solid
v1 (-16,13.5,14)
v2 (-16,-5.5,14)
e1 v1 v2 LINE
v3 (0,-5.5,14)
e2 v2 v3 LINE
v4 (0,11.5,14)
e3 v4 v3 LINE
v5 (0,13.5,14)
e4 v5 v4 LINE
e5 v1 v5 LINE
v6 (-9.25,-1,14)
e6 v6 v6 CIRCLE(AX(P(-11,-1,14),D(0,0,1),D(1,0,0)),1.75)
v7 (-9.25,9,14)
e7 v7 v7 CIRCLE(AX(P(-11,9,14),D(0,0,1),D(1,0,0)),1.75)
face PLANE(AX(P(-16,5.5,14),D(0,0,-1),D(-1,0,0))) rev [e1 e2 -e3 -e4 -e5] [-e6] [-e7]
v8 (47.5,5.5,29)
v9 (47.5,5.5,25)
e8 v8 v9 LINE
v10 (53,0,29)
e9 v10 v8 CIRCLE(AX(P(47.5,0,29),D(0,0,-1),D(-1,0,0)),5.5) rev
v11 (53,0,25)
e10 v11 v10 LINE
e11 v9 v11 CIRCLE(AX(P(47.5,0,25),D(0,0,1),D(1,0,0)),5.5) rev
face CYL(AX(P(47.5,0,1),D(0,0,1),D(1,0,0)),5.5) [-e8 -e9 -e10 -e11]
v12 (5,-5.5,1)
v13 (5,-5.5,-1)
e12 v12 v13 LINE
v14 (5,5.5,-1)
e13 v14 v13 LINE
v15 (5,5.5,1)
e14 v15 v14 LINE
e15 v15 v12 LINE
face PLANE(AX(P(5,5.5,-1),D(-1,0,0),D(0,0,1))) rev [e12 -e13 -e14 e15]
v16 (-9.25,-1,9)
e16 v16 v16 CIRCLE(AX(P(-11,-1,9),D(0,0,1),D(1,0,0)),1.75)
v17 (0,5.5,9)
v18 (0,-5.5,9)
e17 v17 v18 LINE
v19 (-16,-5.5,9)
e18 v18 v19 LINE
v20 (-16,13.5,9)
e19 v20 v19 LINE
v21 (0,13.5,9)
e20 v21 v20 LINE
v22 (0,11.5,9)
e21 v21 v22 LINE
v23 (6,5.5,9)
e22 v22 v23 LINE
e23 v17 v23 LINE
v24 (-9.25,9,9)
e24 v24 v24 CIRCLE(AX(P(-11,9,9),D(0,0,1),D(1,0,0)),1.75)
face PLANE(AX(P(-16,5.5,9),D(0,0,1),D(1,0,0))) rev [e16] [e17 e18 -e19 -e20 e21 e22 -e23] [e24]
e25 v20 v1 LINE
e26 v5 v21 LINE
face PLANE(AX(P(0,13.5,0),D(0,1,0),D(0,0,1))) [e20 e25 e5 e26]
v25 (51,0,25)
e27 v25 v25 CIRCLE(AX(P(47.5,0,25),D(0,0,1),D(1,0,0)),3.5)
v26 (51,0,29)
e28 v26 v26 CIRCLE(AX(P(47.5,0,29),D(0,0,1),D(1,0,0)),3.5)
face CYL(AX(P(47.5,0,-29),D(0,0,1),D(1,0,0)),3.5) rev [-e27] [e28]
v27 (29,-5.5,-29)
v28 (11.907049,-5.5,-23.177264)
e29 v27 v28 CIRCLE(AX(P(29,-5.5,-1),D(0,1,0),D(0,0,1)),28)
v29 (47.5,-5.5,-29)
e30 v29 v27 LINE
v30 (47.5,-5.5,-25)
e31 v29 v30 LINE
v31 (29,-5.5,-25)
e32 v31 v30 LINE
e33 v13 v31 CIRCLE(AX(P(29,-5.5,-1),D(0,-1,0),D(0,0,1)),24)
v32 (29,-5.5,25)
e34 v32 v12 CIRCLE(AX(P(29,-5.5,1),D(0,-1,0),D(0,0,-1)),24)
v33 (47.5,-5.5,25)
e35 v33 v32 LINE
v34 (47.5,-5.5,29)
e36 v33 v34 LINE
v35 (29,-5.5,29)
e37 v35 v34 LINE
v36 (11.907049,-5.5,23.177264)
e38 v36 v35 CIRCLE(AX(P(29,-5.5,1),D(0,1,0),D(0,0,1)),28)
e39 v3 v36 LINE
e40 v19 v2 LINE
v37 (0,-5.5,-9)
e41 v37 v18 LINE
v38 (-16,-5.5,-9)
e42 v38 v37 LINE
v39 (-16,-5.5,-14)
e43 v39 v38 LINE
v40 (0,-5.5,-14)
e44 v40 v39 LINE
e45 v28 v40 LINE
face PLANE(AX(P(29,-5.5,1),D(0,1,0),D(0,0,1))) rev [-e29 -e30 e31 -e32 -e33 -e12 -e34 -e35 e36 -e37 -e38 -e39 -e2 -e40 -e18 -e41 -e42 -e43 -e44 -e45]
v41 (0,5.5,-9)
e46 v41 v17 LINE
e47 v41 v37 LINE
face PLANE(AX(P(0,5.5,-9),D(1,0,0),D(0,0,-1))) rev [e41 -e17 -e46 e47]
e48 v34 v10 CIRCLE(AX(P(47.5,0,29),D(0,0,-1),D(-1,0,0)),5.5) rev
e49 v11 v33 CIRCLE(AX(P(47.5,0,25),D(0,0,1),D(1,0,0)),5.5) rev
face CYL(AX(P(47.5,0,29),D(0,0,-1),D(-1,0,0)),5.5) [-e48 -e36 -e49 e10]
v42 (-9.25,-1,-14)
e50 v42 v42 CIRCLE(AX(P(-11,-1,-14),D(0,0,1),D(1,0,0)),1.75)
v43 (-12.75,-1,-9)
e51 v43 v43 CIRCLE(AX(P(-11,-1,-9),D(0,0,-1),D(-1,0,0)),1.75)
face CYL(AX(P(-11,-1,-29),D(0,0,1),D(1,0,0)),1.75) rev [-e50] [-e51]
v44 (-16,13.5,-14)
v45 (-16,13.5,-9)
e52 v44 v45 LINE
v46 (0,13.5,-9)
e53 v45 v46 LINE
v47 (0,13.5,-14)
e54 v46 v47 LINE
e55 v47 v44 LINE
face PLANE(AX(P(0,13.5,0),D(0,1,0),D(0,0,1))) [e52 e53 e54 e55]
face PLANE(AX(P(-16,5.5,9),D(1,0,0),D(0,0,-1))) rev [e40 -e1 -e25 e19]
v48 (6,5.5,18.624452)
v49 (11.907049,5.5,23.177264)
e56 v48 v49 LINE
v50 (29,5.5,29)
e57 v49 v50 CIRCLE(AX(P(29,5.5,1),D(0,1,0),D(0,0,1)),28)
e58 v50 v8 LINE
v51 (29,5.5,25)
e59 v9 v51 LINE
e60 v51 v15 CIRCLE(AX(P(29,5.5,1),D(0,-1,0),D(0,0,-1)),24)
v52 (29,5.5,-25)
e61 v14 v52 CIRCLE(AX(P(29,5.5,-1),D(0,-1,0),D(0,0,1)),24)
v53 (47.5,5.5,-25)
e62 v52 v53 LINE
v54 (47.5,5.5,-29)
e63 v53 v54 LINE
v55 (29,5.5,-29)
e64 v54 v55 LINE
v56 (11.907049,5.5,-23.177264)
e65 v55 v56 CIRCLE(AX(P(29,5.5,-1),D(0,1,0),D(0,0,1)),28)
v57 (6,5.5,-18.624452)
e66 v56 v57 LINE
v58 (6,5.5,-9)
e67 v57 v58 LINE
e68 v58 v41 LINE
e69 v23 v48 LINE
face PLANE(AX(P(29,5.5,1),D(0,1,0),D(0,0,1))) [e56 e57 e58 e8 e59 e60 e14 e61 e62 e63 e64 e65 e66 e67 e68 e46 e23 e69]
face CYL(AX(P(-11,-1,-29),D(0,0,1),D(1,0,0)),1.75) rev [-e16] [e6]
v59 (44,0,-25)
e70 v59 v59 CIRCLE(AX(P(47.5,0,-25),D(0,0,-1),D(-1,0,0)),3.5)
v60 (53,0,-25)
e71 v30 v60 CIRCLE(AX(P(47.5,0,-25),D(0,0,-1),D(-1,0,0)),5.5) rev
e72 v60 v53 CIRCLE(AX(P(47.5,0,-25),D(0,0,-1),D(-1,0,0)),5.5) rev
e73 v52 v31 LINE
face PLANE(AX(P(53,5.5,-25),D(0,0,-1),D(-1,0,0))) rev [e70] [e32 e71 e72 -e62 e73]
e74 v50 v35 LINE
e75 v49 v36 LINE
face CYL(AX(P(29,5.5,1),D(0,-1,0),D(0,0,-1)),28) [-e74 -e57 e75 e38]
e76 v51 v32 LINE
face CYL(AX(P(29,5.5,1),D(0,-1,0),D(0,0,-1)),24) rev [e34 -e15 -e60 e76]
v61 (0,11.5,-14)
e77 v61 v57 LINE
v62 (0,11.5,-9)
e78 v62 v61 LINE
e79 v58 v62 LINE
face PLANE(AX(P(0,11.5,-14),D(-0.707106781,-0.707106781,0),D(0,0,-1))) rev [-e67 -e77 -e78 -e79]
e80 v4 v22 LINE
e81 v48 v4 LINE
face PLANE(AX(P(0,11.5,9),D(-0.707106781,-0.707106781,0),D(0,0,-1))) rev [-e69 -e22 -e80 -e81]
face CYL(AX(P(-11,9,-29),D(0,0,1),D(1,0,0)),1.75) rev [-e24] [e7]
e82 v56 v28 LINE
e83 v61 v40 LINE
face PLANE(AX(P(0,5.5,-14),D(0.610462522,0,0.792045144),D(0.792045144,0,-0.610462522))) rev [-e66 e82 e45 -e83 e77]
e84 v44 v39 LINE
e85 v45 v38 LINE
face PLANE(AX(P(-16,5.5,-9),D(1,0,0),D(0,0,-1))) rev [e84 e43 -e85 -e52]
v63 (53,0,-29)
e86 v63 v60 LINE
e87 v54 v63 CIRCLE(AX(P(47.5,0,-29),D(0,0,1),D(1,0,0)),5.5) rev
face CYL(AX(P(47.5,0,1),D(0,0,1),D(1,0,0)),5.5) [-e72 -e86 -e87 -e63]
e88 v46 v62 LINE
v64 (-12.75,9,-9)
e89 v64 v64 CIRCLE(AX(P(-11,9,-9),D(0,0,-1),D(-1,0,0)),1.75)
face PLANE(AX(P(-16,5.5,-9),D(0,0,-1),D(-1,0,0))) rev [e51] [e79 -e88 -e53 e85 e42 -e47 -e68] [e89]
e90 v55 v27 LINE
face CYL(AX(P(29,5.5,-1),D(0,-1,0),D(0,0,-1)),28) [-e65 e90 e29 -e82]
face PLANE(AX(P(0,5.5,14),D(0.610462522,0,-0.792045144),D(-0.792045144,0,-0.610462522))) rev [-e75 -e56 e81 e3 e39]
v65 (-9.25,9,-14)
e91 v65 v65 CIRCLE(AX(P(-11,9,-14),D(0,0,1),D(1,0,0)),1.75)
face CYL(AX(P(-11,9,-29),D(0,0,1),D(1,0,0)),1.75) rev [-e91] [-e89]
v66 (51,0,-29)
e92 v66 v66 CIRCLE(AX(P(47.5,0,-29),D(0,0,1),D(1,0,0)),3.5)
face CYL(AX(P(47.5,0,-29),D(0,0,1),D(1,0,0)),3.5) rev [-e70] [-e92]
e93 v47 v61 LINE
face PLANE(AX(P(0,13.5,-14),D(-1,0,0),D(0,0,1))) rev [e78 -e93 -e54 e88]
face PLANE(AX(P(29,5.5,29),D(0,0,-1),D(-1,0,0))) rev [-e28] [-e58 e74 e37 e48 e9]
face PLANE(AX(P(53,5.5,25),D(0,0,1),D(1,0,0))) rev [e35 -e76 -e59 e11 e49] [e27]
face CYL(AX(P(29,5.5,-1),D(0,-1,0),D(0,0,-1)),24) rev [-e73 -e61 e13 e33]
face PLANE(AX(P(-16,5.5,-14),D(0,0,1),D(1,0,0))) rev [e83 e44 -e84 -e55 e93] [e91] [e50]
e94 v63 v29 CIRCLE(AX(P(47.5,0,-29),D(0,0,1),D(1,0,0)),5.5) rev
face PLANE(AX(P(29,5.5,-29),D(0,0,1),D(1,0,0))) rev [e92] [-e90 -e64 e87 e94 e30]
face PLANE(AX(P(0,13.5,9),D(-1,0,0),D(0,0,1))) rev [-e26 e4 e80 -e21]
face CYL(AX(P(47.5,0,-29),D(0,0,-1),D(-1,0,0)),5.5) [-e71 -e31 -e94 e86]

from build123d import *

# Parameters (mm, degrees)
BOSS_EXTRUDE1_DEPTH = 5.5
FILLET1_R           = 5.5
SKETCH2_R           = 3.5
CUT_EXTRUDE1_DEPTH  = 79.760713557
SKETCH3_W           = 16
SKETCH3_H           = 5
BOSS_EXTRUDE2_DEPTH = 8
SKETCH4_R           = 1.75
CUT_EXTRUDE2_DEPTH  = 70.571905249
CHAMFER1_SIZE       = 6


# Some blends are built 0.0001 mm under size
with BuildPart() as part:
    # Sketch1 → Boss-Extrude1 (new, symmetric)
    with BuildSketch(Plane(origin=(0, 0, 0), x_dir=(1, 0, 0), z_dir=(0, 1, 0))):
        with BuildLine():
            Line((-16, 9), (-16, 14))
            Line((-16, 14), (0, 14))
            Line((0, 14), (11.907049388, 23.177264019))
            ThreePointArc((11.907049388, 23.177264019), (19.971251264, 27.504371267), (29, 29))
            Line((29, 29), (53, 29))
            Line((53, 29), (53, 25))
            Line((53, 25), (29, 25))
            ThreePointArc((29, 25), (12.029437252, 17.970562748), (5, 1))
            Line((5, 1), (5, -1))
            ThreePointArc((5, -1), (12.029437252, -17.970562748), (29, -25))
            Line((29, -25), (53, -25))
            Line((53, -25), (53, -29))
            Line((53, -29), (29, -29))
            ThreePointArc((29, -29), (19.971251264, -27.504371267), (11.907049388, -23.177264019))
            Line((11.907049388, -23.177264019), (0, -14))
            Line((0, -14), (-16, -14))
            Line((-16, -14), (-16, -9))
            Line((-16, -9), (0, -9))
            Line((0, -9), (0, 9))
            Line((0, 9), (-16, 9))
        make_face()
    extrude(amount=BOSS_EXTRUDE1_DEPTH, both=True)

    # Fillet1
    fillet1_edges = [part.edges().sort_by_distance(p)[0] for p in [
        (53, -5.5, 27),
        (53, 5.5, 27),
        (53, -5.5, -27),
        (53, 5.5, -27),
    ]]
    fillet(fillet1_edges, radius=FILLET1_R - 0.0001)  # a hair under: the kernel refuses the full size

    # Sketch2 → Cut-Extrude1 (cut, through all)
    with BuildSketch(Plane.XY.offset(29)):
        with Locations((47.5, 0)):
            Circle(SKETCH2_R)
    extrude(amount=-CUT_EXTRUDE1_DEPTH, mode=Mode.SUBTRACT)

    # Sketch3 → Boss-Extrude2 (add)
    with BuildSketch(Plane(origin=(0, 5.5, 0), x_dir=(1, 0, 0), z_dir=(0, 1, 0))):
        with Locations((-8, 11.5)):
            Rectangle(SKETCH3_W, SKETCH3_H)
        with Locations((-8, -11.5)):
            Rectangle(SKETCH3_W, SKETCH3_H)
    extrude(amount=BOSS_EXTRUDE2_DEPTH)

    # Sketch4 → Cut-Extrude2 (cut, through all)
    with BuildSketch(Plane.XY.offset(14)):
        with Locations((-11, 9)):
            Circle(SKETCH4_R)
        with Locations((-11, -1)):
            Circle(SKETCH4_R)
    extrude(amount=-CUT_EXTRUDE2_DEPTH, mode=Mode.SUBTRACT)

    # Chamfer1
    # the kernel refuses this chamfer: 6 mm, written as the material it adds along each edge
    with BuildSketch(Plane(origin=(0, 5.5, -29.430097928), x_dir=(0.9996219169112968, -0.027495876610586348, 0), z_dir=(0, 0, 1))) as chamfer1_piece_1_section:
        Polygon((CHAMFER1_SIZE * 0.999621916911, CHAMFER1_SIZE * 0.0274958766106), (-CHAMFER1_SIZE * 0.0274958766106, CHAMFER1_SIZE * 0.999621916911), (0, 0), align=None)
    chamfer1_piece_1 = extrude(amount=20.430097928, mode=Mode.PRIVATE)
    chamfer1_piece_1 = split(chamfer1_piece_1, bisect_by=Plane(origin=(4.348037064, 5.828125, -17.351215133), z_dir=(0.6104625218625276, 0, 0.7920451435374395)), keep=Keep.TOP, mode=Mode.PRIVATE)
    add(chamfer1_piece_1)
    with BuildSketch(Plane(origin=(0, 5.5, 9), x_dir=(0.9996219169112968, -0.027495876610586348, 0), z_dir=(0, 0, 1))) as chamfer1_piece_2_section:
        Polygon((CHAMFER1_SIZE * 0.999621916911, CHAMFER1_SIZE * 0.0274958766106), (-CHAMFER1_SIZE * 0.0274958766106, CHAMFER1_SIZE * 0.999621916911), (0, 0), align=None)
    chamfer1_piece_2 = extrude(amount=20.430097928, mode=Mode.PRIVATE)
    chamfer1_piece_2 = split(chamfer1_piece_2, bisect_by=Plane(origin=(-0.01385991, 7.547619048, 13.989317584), z_dir=(0.6104625218625275, 0, -0.7920451435374395)), keep=Keep.TOP, mode=Mode.PRIVATE)
    add(chamfer1_piece_2)


solid = part.part
